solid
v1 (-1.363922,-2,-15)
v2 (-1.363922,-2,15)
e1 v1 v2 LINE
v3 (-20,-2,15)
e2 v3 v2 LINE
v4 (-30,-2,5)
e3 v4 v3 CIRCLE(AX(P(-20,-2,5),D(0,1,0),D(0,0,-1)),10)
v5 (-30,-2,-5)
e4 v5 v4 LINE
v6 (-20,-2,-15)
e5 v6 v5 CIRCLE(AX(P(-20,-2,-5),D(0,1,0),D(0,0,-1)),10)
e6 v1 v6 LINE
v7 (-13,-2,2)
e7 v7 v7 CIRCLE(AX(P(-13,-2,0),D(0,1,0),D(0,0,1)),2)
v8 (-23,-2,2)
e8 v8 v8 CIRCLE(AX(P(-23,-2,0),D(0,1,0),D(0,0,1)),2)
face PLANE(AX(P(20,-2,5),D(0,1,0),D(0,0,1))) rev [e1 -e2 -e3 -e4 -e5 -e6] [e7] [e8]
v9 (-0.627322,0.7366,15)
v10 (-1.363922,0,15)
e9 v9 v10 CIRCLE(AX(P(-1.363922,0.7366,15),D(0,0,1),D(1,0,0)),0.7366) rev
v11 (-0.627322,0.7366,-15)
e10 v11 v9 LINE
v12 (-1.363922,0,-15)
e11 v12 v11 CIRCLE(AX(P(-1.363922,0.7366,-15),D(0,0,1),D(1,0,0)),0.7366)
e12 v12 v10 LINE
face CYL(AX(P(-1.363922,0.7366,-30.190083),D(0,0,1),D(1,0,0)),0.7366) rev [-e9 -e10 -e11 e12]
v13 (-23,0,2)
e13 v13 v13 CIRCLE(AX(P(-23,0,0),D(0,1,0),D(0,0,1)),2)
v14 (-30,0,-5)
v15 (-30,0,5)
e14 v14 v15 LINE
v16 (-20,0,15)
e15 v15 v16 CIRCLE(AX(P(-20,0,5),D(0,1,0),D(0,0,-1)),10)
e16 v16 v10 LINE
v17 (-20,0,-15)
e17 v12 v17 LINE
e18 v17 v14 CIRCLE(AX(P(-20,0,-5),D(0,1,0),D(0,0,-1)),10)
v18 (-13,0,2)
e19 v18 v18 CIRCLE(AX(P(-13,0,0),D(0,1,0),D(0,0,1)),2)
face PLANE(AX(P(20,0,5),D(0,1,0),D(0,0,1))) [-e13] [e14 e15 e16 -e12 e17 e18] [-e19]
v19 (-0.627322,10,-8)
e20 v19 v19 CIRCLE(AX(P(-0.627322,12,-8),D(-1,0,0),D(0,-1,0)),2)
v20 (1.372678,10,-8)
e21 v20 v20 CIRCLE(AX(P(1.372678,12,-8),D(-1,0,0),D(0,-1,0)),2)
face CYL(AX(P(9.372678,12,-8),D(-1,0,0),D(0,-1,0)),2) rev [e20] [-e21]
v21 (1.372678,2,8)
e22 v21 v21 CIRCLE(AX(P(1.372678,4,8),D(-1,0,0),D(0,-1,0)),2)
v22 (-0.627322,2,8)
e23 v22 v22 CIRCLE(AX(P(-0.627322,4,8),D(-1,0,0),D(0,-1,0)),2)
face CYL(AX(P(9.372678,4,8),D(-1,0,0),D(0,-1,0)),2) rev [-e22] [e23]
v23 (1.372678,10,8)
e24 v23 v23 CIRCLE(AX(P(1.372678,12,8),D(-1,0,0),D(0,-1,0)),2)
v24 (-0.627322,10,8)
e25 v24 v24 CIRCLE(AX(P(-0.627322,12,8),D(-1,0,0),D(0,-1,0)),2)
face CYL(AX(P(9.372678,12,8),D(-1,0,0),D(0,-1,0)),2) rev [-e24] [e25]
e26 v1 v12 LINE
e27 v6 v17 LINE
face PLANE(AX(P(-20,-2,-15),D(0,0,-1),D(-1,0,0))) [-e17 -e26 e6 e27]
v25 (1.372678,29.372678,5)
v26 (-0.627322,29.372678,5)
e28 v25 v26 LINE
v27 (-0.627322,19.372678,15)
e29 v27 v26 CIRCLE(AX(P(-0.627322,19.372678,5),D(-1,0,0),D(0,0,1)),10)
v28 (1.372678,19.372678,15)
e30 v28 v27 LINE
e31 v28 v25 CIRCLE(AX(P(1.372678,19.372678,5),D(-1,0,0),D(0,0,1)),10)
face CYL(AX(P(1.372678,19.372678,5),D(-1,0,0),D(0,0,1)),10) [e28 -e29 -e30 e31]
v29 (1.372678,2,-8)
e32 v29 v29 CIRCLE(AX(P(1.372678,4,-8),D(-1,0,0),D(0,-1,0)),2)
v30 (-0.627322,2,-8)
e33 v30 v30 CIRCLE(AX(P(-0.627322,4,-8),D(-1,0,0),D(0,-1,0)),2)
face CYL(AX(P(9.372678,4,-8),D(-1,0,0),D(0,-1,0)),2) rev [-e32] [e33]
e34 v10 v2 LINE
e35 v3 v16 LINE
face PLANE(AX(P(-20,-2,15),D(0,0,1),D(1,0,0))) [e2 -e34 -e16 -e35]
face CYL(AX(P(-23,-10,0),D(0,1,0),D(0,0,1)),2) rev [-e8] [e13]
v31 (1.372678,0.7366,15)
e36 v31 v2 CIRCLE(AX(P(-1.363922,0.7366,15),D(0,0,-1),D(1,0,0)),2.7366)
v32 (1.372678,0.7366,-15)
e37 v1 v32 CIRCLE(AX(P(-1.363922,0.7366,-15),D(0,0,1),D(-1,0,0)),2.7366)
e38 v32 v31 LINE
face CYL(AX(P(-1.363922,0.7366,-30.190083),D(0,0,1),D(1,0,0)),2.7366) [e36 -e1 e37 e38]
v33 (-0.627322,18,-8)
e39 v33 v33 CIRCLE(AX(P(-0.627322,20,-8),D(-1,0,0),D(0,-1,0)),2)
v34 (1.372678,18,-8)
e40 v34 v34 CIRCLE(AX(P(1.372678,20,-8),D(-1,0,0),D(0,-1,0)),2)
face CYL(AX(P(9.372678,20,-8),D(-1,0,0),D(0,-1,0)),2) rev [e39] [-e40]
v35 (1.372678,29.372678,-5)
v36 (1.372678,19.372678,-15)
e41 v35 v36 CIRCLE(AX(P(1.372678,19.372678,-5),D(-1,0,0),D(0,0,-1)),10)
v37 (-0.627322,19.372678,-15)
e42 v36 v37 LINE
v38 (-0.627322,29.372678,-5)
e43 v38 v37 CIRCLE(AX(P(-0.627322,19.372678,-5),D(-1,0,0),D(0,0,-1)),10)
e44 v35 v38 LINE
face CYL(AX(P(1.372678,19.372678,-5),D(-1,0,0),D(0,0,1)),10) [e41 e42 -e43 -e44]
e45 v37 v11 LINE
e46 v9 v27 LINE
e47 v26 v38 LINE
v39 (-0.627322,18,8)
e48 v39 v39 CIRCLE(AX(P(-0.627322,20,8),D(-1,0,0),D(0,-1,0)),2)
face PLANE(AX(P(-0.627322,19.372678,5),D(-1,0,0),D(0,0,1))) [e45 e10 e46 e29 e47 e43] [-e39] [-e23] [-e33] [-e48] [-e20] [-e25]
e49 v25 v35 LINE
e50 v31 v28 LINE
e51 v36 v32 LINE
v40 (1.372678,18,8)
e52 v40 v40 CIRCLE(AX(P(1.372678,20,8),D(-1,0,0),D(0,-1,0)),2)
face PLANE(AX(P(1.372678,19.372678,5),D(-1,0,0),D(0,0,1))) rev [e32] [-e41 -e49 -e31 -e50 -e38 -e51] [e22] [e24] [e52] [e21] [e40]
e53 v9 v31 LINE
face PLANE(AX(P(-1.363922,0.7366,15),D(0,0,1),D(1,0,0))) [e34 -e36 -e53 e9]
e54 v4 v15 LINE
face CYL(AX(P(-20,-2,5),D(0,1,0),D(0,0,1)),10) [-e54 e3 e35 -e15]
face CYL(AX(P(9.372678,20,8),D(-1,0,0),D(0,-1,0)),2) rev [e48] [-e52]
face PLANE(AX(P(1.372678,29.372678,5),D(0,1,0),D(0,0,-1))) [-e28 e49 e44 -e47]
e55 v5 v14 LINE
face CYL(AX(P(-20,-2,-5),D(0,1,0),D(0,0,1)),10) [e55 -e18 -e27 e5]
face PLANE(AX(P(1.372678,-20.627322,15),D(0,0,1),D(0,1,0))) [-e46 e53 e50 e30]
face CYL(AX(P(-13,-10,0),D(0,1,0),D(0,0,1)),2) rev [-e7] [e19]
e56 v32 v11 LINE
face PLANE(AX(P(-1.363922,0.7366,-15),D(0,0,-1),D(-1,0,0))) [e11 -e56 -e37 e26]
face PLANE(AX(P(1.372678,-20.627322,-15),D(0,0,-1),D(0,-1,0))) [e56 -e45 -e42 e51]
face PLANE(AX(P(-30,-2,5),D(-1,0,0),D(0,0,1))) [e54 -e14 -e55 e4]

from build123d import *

# Parameters (mm, degrees)
BASE_FLANGE1_DEPTH       = 2
SKETCHED_START           = 1.372677549
SKETCHED_BEND1_OUTLINE_W = 2
SKETCHED_BEND1_OUTLINE_H = 30
SKETCHED_BEND1_DEPTH     = 28.627322451
SKETCHED_START_2         = -0.627322451
SKETCHED_BEND1_2_DEPTH   = 1.733838284
SKETCHED_START_3         = -1.363922451
SKETCHED_BEND1_3_DEPTH   = 2.7366
SKETCHED_START_4         = -15
SKETCHED_BEND1_4_DEPTH   = 30
SKETCH8_R                = 2
CUT_EXTRUDE1_DEPTH       = 10
SKETCH9_R                = 2
CUT_EXTRUDE2_DEPTH       = 10


with BuildPart() as part:
    # Base-Flange1: sheet metal written as solids
    # Sketch1 → Base-Flange1 (new body)
    with BuildSketch(Plane(origin=(0, 0, 0), x_dir=(1, 0, 0), z_dir=(0, 1, 0))):
        with BuildLine():
            Line((-20, -15), (20, -15))
            ThreePointArc((20, -15), (27.071067812, -12.071067812), (30, -5))
            Line((30, -5), (30, 5))
            ThreePointArc((30, 5), (27.071067812, 12.071067812), (20, 15))
            Line((20, 15), (-20, 15))
            ThreePointArc((-20, 15), (-27.071067812, 12.071067812), (-30, 5))
            Line((-30, 5), (-30, -5))
            ThreePointArc((-30, -5), (-27.071067812, -12.071067812), (-20, -15))
        make_face()
    extrude(amount=-BASE_FLANGE1_DEPTH)

    # Sketched Bend1: read off the stored shape, not the designer's step
    # Sketched Bend1 outline → Sketched Bend1 (cut)
    with BuildSketch(Plane.YZ.offset(SKETCHED_START)):
        with Locations((-1, 0)):
            Rectangle(SKETCHED_BEND1_OUTLINE_W, SKETCHED_BEND1_OUTLINE_H)
    extrude(amount=SKETCHED_BEND1_DEPTH, mode=Mode.SUBTRACT)

    # Sketched Bend1 2 outline → Sketched Bend1 2 (add)
    with BuildSketch(Plane.YZ.offset(SKETCHED_START_2)):
        with BuildLine():
            ThreePointArc((29.372677549, 5), (26.443745361, 12.071067812), (19.372677549, 15))
            Line((19.372677549, 15), (0, 15))
            Line((0, 15), (0, -15))
            Line((0, -15), (19.372677549, -15))
            ThreePointArc((19.372677549, -15), (26.443745361, -12.071067812), (29.372677549, -5))
            Line((29.372677549, -5), (29.372677549, 5))
        make_face()
    extrude(amount=SKETCHED_BEND1_2_DEPTH)

    # Sketched Bend1 3 outline → Sketched Bend1 3 (add)
    with BuildSketch(Plane.YZ.offset(SKETCHED_START_3)):
        with BuildLine():
            ThreePointArc((29.372677549, 5), (26.443745361, 12.071067812), (19.372677549, 15))
            Line((19.372677549, 15), (0, 15))
            Line((0, 15), (0, -15))
            Line((0, -15), (19.372677549, -15))
            ThreePointArc((19.372677549, -15), (26.443745361, -12.071067812), (29.372677549, -5))
            Line((29.372677549, -5), (29.372677549, 5))
        make_face()
    extrude(amount=SKETCHED_BEND1_3_DEPTH)

    # Sketched Bend1 4 outline → Sketched Bend1 4 (cut)
    with BuildSketch(Plane.XY.offset(SKETCHED_START_4)):
        with BuildLine():
            Line((-0.627322451, 0.7366), (-0.627322451, 29.372677549))
            Line((-0.627322451, 29.372677549), (-1.363922451, 29.372677549))
            Line((-1.363922451, 29.372677549), (-1.363922451, 0))
            ThreePointArc((-1.363922451, 0), (-0.843067596, 0.215745145), (-0.627322451, 0.7366))
        make_face()
        with BuildLine():
            Line((1.372677549, -2), (1.372677549, 0.7366))
            ThreePointArc((1.372677549, 0.7366), (0.571145967, -1.198468417), (-1.363922451, -2))
            Line((-1.363922451, -2), (1.372677549, -2))
        make_face()
    extrude(amount=SKETCHED_BEND1_4_DEPTH, mode=Mode.SUBTRACT)

    # Sketch8 → Cut-Extrude1 (cut)
    with BuildSketch(Plane.ZY.offset(0.627322451)):
        with Locations(Location((-8, 4, 0), (0, 0, 270))):
            Circle(SKETCH8_R)
        with Locations(Location((8, 4, 0), (0, 0, 270))):
            Circle(SKETCH8_R)
        with Locations(Location((-8, 12, 0), (0, 0, 270))):
            Circle(SKETCH8_R)
        with Locations(Location((-8, 20, 0), (0, 0, 270))):
            Circle(SKETCH8_R)
        with Locations(Location((8, 20, 0), (0, 0, 270))):
            Circle(SKETCH8_R)
        with Locations(Location((8, 12, 0), (0, 0, 270))):
            Circle(SKETCH8_R)
    extrude(amount=-CUT_EXTRUDE1_DEPTH, mode=Mode.SUBTRACT)

    # Sketch9 → Cut-Extrude2 (cut)
    with BuildSketch(Plane(origin=(0, 0, 0), x_dir=(1, 0, 0), z_dir=(0, 1, 0))):
        with Locations(Location((-23, 0, 0), (0, 0, 270))):
            Circle(SKETCH9_R)
        with Locations(Location((-13, 0, 0), (0, 0, 270))):
            Circle(SKETCH9_R)
    extrude(amount=-CUT_EXTRUDE2_DEPTH, mode=Mode.SUBTRACT)


solid = part.part
